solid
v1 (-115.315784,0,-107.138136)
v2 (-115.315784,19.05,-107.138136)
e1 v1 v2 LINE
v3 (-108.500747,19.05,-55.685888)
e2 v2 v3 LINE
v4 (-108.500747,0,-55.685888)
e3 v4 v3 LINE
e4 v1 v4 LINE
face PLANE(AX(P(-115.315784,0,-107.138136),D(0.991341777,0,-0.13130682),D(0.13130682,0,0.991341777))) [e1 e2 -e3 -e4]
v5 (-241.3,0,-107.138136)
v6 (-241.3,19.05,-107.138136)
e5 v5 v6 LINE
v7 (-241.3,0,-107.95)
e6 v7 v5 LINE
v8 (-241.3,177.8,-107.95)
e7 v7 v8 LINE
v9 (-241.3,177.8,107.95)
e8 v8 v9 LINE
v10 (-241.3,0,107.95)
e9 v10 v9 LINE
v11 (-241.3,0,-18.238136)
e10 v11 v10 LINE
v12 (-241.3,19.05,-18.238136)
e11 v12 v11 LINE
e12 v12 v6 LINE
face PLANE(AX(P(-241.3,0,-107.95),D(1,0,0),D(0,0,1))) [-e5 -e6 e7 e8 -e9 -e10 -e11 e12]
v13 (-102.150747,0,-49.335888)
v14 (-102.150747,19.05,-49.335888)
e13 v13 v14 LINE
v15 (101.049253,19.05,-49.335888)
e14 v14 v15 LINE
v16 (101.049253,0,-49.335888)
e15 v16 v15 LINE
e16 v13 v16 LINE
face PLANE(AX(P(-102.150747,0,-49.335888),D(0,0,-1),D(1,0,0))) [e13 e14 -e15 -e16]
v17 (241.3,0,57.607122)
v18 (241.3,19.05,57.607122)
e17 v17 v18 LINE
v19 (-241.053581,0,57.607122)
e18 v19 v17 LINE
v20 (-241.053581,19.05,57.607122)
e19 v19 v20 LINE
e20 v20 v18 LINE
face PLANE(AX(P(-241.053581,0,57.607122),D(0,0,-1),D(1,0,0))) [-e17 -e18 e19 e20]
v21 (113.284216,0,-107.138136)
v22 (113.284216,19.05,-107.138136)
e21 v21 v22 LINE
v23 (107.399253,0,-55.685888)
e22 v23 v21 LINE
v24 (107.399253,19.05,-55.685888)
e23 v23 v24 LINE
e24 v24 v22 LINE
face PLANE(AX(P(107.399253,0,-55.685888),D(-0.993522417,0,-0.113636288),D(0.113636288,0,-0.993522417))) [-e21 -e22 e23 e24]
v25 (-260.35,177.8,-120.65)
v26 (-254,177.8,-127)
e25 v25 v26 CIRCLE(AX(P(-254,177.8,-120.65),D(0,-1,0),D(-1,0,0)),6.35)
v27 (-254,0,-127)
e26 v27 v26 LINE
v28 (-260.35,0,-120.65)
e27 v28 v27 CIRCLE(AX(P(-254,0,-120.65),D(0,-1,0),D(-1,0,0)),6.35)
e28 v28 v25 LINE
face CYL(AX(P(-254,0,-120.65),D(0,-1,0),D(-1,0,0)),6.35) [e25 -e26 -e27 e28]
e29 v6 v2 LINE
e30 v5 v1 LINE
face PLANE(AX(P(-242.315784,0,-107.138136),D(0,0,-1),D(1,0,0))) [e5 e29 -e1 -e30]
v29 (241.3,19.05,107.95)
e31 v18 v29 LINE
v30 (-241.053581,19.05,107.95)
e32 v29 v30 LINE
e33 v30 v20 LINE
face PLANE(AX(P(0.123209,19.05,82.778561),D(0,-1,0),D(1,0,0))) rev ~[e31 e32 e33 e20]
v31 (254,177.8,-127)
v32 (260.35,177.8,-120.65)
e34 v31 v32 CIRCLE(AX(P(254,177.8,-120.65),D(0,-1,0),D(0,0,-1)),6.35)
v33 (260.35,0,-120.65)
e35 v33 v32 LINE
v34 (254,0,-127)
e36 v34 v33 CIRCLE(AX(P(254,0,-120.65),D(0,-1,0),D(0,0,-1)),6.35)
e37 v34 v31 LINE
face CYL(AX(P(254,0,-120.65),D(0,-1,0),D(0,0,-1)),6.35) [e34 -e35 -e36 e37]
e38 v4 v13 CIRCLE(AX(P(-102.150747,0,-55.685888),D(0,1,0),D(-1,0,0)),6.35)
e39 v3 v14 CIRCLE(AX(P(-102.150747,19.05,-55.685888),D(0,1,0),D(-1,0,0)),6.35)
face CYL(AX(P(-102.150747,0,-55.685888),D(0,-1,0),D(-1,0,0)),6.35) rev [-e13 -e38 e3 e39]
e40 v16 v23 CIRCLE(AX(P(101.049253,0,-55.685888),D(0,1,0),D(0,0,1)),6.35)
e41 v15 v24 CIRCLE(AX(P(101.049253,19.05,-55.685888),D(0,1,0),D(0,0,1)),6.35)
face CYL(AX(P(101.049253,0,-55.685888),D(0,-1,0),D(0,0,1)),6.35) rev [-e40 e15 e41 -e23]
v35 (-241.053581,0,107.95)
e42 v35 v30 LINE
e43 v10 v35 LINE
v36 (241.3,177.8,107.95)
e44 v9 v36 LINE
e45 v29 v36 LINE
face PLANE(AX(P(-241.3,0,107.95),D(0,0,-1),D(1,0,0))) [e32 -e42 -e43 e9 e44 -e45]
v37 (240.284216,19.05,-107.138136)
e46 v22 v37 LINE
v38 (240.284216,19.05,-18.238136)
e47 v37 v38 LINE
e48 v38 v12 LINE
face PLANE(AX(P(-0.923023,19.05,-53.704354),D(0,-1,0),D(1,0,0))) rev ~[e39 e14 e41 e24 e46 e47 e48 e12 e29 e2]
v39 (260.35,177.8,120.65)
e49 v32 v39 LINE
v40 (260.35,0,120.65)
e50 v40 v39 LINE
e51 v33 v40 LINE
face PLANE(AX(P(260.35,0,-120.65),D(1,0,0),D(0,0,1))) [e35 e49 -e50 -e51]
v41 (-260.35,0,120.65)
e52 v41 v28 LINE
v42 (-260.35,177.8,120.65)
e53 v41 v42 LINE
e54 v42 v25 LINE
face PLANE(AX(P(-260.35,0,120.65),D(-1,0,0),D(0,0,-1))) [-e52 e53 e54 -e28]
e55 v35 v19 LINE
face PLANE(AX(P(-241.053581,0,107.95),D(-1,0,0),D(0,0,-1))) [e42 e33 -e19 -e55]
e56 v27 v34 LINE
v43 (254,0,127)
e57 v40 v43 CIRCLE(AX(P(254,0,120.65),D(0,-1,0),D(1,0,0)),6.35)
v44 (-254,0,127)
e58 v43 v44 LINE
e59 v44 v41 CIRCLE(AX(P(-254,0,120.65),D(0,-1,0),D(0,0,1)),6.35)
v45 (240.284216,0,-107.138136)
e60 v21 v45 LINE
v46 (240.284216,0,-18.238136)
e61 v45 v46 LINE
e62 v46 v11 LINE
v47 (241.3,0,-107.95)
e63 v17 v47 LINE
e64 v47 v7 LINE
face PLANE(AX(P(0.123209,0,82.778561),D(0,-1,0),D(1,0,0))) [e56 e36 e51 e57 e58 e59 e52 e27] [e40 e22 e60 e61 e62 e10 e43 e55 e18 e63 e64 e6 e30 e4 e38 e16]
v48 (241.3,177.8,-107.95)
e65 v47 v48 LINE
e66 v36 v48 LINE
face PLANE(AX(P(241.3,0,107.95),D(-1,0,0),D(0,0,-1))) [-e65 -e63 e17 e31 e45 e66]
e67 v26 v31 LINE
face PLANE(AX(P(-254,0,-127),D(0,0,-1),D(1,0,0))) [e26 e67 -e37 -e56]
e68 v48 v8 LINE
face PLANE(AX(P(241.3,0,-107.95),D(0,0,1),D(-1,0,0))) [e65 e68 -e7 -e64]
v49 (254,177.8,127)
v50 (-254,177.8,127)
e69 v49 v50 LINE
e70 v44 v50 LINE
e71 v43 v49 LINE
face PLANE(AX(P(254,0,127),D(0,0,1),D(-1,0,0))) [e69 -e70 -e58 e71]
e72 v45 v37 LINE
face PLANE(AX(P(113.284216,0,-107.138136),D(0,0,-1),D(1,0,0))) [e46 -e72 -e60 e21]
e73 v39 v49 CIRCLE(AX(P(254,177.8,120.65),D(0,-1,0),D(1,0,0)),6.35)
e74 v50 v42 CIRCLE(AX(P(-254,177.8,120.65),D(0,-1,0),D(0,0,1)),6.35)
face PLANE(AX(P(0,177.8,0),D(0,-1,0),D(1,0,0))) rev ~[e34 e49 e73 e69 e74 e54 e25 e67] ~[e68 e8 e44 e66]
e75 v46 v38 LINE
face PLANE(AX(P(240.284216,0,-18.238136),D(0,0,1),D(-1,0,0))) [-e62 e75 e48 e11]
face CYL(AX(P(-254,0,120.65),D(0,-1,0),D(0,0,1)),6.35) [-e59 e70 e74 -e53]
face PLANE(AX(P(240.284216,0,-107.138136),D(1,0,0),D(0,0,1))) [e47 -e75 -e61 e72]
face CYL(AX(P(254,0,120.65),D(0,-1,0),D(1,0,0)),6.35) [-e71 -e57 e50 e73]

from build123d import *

# Parameters (mm, degrees)
F2_DEPTH = 177.8
F3_DEPTH = 19.05
F1_W     = 482.6
F1_H     = 50.8
F4_DEPTH = 19.05


# Not quite as in the source:
# - a feature names something its author has since deleted; it is built from what else it names


with BuildPart() as f2:
    # F0 (on Front) → F2 (new body)
    with BuildSketch(Plane.XZ):
        with BuildLine():
            Line((-254, -127), (254, -127))
            ThreePointArc((254, -127), (258.4901280605, -125.1401280605), (260.35, -120.65))
            Line((260.35, -120.65), (260.35, 120.65))
            ThreePointArc((260.35, 120.65), (258.4901280605, 125.1401280605), (254, 127))
            Line((254, 127), (-254, 127))
            ThreePointArc((-254, 127), (-258.4901280605, 125.1401280605), (-260.35, 120.65))
            Line((-260.35, 120.65), (-260.35, -120.65))
            ThreePointArc((-260.35, -120.65), (-258.4901280605, -125.1401280605), (-254, -127))
        make_face()
        Polygon((222.25, 107.95), (241.3, 107.95), (241.3, -107.95), (222.25, -107.95), (-222.25, -107.95), (-241.3, -107.95), (-241.3, 107.95), (-222.25, 107.95), align=None, mode=Mode.SUBTRACT)
    extrude(amount=-F2_DEPTH)

    # F1 (on face) → F3 (join)
    with BuildSketch(Plane.XZ):
        Polygon((-222.25, 107.95), (-241.0535812378, 107.95), (-241.0535812378, 57.6071217656), (241.3, 57.6071217656), (241.3, 107.95), (222.25, 107.95), align=None)
    extrude(amount=-F3_DEPTH)

    # F1 (on face) → F4 (join)
    with BuildSketch(Plane.XZ):
        with Locations((0.2464187622, 83.0071217656)):
            Rectangle(F1_W, F1_H)
        with BuildLine():
            Line((-102.1507469177, -49.3358883619), (-0.5507469177, -49.3358883619))
            Line((-0.5507469177, -49.3358883619), (101.0492530823, -49.3358883619))
            ThreePointArc((101.0492530823, -49.3358883619), (105.5393811428, -51.1957603014), (107.3992530823, -55.6858883619))
            Line((107.3992530823, -55.6858883619), (113.2842159033, -107.1381363198))
            Line((113.2842159033, -107.1381363198), (240.2842159033, -107.1381363198))
            Line((240.2842159033, -107.1381363198), (240.2842159033, -18.2381363198))
            Line((240.2842159033, -18.2381363198), (-242.3157840967, -18.2381363198))
            Line((-242.3157840967, -18.2381363198), (-242.3157840967, -107.1381363198))
            Line((-242.3157840967, -107.1381363198), (-115.3157840967, -107.1381363198))
            Line((-115.3157840967, -107.1381363198), (-108.5007469177, -55.6858883619))
            ThreePointArc((-108.5007469177, -55.6858883619), (-106.6408749783, -51.1957603014), (-102.1507469177, -49.3358883619))
        make_face()
    extrude(amount=-F4_DEPTH)


solid = f2.part
